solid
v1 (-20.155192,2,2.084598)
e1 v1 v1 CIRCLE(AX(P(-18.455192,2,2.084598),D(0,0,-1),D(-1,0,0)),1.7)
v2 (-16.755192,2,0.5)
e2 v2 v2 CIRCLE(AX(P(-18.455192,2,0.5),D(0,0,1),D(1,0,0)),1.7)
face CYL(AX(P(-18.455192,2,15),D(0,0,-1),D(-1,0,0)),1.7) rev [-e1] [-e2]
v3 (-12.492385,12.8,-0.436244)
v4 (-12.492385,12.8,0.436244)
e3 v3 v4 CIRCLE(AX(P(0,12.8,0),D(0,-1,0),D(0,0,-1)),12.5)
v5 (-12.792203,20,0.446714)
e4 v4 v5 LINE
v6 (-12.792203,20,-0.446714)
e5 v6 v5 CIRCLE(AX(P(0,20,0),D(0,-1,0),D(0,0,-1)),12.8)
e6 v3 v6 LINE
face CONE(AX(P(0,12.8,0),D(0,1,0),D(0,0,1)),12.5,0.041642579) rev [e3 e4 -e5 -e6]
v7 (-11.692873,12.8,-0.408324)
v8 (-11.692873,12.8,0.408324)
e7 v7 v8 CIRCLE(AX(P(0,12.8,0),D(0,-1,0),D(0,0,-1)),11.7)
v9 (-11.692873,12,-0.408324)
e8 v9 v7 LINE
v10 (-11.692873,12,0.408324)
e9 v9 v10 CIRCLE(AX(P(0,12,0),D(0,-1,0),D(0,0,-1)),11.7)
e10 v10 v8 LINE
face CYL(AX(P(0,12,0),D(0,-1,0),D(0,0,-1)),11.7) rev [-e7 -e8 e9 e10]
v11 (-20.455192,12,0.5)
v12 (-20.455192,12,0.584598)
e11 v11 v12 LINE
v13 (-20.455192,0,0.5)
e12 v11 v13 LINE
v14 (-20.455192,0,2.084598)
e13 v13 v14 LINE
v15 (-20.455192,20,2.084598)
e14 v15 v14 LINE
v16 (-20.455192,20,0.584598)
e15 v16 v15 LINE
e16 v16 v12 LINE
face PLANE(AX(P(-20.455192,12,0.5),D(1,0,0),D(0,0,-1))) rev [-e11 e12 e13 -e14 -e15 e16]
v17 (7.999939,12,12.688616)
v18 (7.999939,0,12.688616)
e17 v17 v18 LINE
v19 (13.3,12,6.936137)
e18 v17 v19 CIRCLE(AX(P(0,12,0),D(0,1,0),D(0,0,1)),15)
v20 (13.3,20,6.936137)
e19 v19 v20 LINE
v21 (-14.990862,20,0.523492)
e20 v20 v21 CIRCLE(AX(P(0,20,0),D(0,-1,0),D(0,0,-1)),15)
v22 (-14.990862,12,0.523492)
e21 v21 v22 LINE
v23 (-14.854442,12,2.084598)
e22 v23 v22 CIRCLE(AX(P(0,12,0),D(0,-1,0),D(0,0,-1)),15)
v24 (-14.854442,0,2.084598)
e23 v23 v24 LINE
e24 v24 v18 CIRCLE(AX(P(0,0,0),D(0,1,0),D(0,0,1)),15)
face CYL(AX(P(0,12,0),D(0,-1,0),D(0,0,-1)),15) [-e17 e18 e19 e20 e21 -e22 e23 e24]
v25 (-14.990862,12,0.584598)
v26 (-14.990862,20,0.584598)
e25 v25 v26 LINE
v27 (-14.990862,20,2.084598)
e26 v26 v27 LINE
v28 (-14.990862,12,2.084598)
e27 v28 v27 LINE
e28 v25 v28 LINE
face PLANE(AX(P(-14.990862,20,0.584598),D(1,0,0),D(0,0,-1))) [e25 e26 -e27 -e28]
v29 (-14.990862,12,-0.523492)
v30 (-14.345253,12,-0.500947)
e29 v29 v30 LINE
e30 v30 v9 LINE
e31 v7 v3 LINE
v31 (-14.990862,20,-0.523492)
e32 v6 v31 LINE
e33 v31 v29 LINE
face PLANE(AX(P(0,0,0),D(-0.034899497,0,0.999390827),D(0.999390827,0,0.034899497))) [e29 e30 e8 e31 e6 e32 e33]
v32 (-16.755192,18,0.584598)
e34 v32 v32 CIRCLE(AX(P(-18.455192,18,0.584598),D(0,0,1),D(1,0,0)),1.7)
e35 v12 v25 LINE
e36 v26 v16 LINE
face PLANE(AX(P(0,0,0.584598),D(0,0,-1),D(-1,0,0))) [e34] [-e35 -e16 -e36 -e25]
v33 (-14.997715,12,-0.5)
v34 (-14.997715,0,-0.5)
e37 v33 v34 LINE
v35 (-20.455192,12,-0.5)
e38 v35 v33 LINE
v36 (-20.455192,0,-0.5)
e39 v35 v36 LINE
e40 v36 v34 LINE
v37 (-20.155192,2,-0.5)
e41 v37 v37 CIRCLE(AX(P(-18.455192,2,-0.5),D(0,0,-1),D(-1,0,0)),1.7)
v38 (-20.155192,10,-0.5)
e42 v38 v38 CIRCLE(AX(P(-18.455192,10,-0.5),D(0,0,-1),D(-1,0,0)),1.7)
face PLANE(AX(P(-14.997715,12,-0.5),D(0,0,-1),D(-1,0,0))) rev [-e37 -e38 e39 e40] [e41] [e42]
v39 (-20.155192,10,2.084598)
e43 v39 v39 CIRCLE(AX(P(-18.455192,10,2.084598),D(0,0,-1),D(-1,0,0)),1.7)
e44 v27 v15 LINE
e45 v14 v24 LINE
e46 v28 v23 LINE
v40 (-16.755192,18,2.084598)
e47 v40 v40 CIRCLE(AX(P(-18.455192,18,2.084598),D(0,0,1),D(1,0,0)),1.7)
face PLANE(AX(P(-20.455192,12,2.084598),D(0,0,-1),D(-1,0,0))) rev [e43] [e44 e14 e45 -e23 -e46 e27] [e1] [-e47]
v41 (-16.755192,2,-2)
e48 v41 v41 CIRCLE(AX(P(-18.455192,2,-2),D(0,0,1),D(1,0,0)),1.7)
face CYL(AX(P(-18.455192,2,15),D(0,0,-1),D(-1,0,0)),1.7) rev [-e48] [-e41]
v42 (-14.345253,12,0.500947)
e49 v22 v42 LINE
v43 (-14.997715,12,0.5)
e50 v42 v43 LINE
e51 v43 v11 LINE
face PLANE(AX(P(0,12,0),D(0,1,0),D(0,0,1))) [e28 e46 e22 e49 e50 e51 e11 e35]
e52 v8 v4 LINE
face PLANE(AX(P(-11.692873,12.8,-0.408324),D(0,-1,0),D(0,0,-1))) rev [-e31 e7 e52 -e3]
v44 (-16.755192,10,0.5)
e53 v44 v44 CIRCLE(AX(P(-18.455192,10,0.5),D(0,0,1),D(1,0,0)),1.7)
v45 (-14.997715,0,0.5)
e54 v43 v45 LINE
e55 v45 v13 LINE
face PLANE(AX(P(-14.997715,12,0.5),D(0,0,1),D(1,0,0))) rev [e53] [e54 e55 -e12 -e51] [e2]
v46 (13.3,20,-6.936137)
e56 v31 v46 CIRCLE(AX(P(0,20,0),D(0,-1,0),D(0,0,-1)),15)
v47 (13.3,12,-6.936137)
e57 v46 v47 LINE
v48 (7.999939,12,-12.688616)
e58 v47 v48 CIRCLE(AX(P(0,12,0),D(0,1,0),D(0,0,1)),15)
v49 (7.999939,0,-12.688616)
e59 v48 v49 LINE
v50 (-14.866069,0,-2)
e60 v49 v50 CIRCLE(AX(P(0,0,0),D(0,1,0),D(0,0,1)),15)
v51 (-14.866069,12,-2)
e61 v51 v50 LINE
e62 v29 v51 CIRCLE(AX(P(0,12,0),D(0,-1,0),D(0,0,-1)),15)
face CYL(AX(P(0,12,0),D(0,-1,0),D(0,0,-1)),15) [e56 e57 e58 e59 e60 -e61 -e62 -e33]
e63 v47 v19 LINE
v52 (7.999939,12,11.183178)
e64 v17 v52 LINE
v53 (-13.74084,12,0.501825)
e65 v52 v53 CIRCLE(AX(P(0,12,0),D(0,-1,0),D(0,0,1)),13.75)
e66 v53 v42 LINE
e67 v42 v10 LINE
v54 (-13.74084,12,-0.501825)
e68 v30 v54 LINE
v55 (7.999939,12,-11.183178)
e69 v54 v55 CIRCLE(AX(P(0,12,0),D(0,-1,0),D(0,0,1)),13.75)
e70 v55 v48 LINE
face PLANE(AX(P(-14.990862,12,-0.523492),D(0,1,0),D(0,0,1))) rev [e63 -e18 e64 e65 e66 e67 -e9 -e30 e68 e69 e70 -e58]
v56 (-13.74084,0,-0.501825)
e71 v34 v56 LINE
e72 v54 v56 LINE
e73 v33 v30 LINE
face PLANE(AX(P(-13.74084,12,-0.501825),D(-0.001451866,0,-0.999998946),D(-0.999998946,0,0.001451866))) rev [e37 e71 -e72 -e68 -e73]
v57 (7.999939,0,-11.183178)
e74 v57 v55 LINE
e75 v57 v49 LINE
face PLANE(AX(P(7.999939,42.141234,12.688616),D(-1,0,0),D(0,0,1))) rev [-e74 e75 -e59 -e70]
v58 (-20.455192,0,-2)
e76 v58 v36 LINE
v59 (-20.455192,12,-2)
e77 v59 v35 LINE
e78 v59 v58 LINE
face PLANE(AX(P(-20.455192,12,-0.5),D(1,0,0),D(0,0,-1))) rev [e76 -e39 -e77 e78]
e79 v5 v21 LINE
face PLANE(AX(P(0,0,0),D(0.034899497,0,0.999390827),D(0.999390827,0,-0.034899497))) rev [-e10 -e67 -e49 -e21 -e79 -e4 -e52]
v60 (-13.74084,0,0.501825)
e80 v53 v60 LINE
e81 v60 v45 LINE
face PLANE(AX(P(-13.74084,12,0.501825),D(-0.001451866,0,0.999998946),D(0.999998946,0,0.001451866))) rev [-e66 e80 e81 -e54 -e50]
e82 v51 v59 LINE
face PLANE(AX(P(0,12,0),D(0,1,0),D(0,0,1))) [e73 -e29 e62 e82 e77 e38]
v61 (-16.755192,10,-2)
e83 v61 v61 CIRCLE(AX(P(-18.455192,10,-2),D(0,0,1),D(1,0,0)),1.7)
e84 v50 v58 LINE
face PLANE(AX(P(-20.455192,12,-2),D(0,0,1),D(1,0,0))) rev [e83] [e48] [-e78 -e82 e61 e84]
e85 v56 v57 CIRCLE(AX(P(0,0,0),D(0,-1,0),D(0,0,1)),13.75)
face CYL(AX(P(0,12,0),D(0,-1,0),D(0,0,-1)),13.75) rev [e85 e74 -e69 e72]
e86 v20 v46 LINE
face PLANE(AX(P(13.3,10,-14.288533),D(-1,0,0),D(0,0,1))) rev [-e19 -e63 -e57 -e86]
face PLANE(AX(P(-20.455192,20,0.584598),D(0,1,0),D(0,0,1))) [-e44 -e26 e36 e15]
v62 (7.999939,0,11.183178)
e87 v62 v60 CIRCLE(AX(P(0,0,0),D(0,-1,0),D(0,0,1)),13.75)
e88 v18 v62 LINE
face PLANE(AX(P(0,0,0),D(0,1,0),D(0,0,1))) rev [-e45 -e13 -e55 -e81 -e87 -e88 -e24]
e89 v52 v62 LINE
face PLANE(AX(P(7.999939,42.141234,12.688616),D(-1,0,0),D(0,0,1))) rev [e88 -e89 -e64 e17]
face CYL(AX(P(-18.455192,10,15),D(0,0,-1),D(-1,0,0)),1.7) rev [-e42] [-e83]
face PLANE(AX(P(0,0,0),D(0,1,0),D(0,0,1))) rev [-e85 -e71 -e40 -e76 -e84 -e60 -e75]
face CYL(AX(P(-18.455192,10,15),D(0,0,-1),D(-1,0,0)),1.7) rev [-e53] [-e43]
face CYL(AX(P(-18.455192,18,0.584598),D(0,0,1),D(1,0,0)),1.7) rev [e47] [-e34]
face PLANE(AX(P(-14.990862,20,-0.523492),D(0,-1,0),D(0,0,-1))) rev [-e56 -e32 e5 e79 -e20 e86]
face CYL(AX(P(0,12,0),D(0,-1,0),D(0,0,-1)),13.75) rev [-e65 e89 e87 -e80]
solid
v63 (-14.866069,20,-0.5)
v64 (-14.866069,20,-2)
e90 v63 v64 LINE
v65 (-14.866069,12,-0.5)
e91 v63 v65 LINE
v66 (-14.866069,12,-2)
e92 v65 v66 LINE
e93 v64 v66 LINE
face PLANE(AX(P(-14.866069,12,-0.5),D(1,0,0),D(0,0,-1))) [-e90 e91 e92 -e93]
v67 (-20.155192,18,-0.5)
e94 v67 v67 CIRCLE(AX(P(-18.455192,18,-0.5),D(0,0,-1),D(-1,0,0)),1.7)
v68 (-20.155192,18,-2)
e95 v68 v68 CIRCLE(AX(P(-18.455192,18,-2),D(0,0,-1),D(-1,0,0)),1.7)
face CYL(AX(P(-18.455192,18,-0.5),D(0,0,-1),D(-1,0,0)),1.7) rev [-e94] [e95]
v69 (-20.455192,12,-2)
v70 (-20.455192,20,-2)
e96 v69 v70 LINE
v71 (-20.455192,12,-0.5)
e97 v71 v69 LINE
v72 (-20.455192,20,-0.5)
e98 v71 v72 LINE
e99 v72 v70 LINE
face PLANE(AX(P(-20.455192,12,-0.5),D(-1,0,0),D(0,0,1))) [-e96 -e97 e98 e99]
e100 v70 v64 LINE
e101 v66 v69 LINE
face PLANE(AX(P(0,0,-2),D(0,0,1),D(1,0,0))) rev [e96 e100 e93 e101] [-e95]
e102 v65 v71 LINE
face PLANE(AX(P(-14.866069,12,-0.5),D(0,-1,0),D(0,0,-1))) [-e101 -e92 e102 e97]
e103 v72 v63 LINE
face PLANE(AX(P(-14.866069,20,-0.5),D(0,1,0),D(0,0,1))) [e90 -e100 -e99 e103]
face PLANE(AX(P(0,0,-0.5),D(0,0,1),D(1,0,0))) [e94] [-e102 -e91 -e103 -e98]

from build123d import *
from build123d.topology import SkipClean

# Parameters (mm, degrees)
BOSS_EXTRUDE1_DEPTH      = 12
REVOLVE1_ANGLE           = 268
REVOLVE1_OTHER_WAY_ANGLE = 88
CUT_EXTRUDE1_DEPTH       = 34.277843841
CUT_EXTRUDE1_DEPTH_BACK  = 34.277843841
SKETCH4_R                = 1.7
SKETCH5_W                = 5.464329862
SKETCH5_H                = 8
SKETCH5_R                = 1.7
BOSS_EXTRUDE3_DEPTH      = 1.5
SKETCH6_W                = 5.58912352
SKETCH6_H                = 8
SKETCH6_R                = 1.7
BOSS_EXTRUDE6_DEPTH      = 1.5
SKETCH7_W                = 13.395261238
SKETCH7_H                = 27.001129241
CUT_EXTRUDE2_DEPTH       = 12
SKETCH8_W                = 6.997667241
SKETCH8_H                = 27.404272266
CUT_EXTRUDE3_DEPTH       = 10


with BuildPart() as part:
    # Sketch1 → Boss-Extrude1 (new body)
    with BuildSketch(Plane(origin=(0, 0, 0), x_dir=(1, 0, 0), z_dir=(0, 1, 0))):
        with BuildLine():
            Line((-13.740839561, 0.501824818), (-14.997715427, 0.5))
            Line((-14.997715427, 0.5), (-20.455192267, 0.5))
            Line((-20.455192267, 0.5), (-20.455192267, 2))
            Line((-20.455192267, 2), (-14.866068747, 2))
            ThreePointArc((-14.866068747, 2), (-12.460231809, 8.351204898), (-7.5, 12.990381057))
            ThreePointArc((-7.5, 12.990381057), (15, 0), (-7.5, -12.990381057))
            ThreePointArc((-7.5, -12.990381057), (-12.436410154, -8.386638331), (-14.85444215, -2.084597902))
            Line((-14.85444215, -2.084597902), (-20.455192267, -2.084597902))
            Line((-20.455192267, -2.084597902), (-20.455192267, -0.5))
            Line((-20.455192267, -0.5), (-14.997715427, -0.5))
            Line((-14.997715427, -0.5), (-13.740839561, -0.501824818))
            ThreePointArc((-13.740839561, -0.501824818), (-11.780388739, -7.09118757), (-6.875, -11.907849302))
            ThreePointArc((-6.875, -11.907849302), (13.75, 0), (-6.875, 11.907849302))
            ThreePointArc((-6.875, 11.907849302), (-11.780388739, 7.09118757), (-13.740839561, 0.501824818))
        make_face()
    extrude(amount=BOSS_EXTRUDE1_DEPTH)

    # Sketch3 → Revolve1 (revolve)
    with BuildSketch(Plane(origin=(0, 0, 0), x_dir=(0, 0, -1), z_dir=(1, 0, 0))):
        Polygon((-15, 12), (-15, 20), (-12.8, 20), (-12.5, 12.8), (-11.7, 12.8), (-11.7, 12), (-12.2, 12), align=None)
    revolve(axis=Axis((0, 12, 0), (0, 1, 0)), revolution_arc=REVOLVE1_ANGLE)

    # Sketch3 → Revolve1 other way (revolve)
    with SkipClean():  # the faces are left unmerged after this step: merging them gives an invalid solid
        with BuildSketch(Plane(origin=(0, 0, 0), x_dir=(0, 0, -1), z_dir=(1, 0, 0))):
            Polygon((-15, 12), (-15, 20), (-12.8, 20), (-12.5, 12.8), (-11.7, 12.8), (-11.7, 12), (-12.2, 12), align=None)
        revolve(axis=Axis((0, 12, 0), (0, -1, 0)), revolution_arc=REVOLVE1_OTHER_WAY_ANGLE)
    add(part.part.scale(1), mode=Mode.REPLACE)  # the faces are merged on a copy

    # Sketch4 → Cut-Extrude1 (cut, two sides: drawn at the far end of the back side and taken through both)
    with BuildSketch(Plane(origin=(0, 0, -2), x_dir=(-1, 0, 0), z_dir=(0, 0, -1)).offset(-CUT_EXTRUDE1_DEPTH_BACK)):
        with Locations((18.455192267, 10)):
            Circle(SKETCH4_R)
        with Locations((18.455192267, 2)):
            Circle(SKETCH4_R)
    extrude(amount=CUT_EXTRUDE1_DEPTH + CUT_EXTRUDE1_DEPTH_BACK, mode=Mode.SUBTRACT)

    # Sketch5 → Boss-Extrude3 (add)
    with BuildSketch(Plane.XY.offset(2.084597902)):
        with Locations((-17.723027336, 16)):
            Rectangle(SKETCH5_W, SKETCH5_H)
        with Locations((-18.455192267, 18)):
            Circle(SKETCH5_R, mode=Mode.SUBTRACT)
    extrude(amount=-BOSS_EXTRUDE3_DEPTH)

    # Sketch7 → Cut-Extrude2 (cut)
    with BuildSketch(Plane.XZ):
        with Locations((14.697569852, -0.811948768)):
            Rectangle(SKETCH7_W, SKETCH7_H)
    extrude(amount=-CUT_EXTRUDE2_DEPTH, mode=Mode.SUBTRACT)

    # Sketch8 → Cut-Extrude3 (cut)
    with BuildSketch(Plane(origin=(0, 20, 0), x_dir=(1, 0, 0), z_dir=(0, 1, 0))):
        with Locations((16.798833621, 0.586396696)):
            Rectangle(SKETCH8_W, SKETCH8_H)
    extrude(amount=-CUT_EXTRUDE3_DEPTH, mode=Mode.SUBTRACT)


with BuildPart() as body_2:
    # Sketch6 → Boss-Extrude6 (new body)
    with BuildSketch(Plane(origin=(0, 0, -2), x_dir=(-1, 0, 0), z_dir=(0, 0, -1))):
        with Locations((17.660630507, 16)):
            Rectangle(SKETCH6_W, SKETCH6_H)
        with Locations((18.455192267, 18)):
            Circle(SKETCH6_R, mode=Mode.SUBTRACT)
    extrude(amount=-BOSS_EXTRUDE6_DEPTH)


solid = Compound([part.part, body_2.part])
